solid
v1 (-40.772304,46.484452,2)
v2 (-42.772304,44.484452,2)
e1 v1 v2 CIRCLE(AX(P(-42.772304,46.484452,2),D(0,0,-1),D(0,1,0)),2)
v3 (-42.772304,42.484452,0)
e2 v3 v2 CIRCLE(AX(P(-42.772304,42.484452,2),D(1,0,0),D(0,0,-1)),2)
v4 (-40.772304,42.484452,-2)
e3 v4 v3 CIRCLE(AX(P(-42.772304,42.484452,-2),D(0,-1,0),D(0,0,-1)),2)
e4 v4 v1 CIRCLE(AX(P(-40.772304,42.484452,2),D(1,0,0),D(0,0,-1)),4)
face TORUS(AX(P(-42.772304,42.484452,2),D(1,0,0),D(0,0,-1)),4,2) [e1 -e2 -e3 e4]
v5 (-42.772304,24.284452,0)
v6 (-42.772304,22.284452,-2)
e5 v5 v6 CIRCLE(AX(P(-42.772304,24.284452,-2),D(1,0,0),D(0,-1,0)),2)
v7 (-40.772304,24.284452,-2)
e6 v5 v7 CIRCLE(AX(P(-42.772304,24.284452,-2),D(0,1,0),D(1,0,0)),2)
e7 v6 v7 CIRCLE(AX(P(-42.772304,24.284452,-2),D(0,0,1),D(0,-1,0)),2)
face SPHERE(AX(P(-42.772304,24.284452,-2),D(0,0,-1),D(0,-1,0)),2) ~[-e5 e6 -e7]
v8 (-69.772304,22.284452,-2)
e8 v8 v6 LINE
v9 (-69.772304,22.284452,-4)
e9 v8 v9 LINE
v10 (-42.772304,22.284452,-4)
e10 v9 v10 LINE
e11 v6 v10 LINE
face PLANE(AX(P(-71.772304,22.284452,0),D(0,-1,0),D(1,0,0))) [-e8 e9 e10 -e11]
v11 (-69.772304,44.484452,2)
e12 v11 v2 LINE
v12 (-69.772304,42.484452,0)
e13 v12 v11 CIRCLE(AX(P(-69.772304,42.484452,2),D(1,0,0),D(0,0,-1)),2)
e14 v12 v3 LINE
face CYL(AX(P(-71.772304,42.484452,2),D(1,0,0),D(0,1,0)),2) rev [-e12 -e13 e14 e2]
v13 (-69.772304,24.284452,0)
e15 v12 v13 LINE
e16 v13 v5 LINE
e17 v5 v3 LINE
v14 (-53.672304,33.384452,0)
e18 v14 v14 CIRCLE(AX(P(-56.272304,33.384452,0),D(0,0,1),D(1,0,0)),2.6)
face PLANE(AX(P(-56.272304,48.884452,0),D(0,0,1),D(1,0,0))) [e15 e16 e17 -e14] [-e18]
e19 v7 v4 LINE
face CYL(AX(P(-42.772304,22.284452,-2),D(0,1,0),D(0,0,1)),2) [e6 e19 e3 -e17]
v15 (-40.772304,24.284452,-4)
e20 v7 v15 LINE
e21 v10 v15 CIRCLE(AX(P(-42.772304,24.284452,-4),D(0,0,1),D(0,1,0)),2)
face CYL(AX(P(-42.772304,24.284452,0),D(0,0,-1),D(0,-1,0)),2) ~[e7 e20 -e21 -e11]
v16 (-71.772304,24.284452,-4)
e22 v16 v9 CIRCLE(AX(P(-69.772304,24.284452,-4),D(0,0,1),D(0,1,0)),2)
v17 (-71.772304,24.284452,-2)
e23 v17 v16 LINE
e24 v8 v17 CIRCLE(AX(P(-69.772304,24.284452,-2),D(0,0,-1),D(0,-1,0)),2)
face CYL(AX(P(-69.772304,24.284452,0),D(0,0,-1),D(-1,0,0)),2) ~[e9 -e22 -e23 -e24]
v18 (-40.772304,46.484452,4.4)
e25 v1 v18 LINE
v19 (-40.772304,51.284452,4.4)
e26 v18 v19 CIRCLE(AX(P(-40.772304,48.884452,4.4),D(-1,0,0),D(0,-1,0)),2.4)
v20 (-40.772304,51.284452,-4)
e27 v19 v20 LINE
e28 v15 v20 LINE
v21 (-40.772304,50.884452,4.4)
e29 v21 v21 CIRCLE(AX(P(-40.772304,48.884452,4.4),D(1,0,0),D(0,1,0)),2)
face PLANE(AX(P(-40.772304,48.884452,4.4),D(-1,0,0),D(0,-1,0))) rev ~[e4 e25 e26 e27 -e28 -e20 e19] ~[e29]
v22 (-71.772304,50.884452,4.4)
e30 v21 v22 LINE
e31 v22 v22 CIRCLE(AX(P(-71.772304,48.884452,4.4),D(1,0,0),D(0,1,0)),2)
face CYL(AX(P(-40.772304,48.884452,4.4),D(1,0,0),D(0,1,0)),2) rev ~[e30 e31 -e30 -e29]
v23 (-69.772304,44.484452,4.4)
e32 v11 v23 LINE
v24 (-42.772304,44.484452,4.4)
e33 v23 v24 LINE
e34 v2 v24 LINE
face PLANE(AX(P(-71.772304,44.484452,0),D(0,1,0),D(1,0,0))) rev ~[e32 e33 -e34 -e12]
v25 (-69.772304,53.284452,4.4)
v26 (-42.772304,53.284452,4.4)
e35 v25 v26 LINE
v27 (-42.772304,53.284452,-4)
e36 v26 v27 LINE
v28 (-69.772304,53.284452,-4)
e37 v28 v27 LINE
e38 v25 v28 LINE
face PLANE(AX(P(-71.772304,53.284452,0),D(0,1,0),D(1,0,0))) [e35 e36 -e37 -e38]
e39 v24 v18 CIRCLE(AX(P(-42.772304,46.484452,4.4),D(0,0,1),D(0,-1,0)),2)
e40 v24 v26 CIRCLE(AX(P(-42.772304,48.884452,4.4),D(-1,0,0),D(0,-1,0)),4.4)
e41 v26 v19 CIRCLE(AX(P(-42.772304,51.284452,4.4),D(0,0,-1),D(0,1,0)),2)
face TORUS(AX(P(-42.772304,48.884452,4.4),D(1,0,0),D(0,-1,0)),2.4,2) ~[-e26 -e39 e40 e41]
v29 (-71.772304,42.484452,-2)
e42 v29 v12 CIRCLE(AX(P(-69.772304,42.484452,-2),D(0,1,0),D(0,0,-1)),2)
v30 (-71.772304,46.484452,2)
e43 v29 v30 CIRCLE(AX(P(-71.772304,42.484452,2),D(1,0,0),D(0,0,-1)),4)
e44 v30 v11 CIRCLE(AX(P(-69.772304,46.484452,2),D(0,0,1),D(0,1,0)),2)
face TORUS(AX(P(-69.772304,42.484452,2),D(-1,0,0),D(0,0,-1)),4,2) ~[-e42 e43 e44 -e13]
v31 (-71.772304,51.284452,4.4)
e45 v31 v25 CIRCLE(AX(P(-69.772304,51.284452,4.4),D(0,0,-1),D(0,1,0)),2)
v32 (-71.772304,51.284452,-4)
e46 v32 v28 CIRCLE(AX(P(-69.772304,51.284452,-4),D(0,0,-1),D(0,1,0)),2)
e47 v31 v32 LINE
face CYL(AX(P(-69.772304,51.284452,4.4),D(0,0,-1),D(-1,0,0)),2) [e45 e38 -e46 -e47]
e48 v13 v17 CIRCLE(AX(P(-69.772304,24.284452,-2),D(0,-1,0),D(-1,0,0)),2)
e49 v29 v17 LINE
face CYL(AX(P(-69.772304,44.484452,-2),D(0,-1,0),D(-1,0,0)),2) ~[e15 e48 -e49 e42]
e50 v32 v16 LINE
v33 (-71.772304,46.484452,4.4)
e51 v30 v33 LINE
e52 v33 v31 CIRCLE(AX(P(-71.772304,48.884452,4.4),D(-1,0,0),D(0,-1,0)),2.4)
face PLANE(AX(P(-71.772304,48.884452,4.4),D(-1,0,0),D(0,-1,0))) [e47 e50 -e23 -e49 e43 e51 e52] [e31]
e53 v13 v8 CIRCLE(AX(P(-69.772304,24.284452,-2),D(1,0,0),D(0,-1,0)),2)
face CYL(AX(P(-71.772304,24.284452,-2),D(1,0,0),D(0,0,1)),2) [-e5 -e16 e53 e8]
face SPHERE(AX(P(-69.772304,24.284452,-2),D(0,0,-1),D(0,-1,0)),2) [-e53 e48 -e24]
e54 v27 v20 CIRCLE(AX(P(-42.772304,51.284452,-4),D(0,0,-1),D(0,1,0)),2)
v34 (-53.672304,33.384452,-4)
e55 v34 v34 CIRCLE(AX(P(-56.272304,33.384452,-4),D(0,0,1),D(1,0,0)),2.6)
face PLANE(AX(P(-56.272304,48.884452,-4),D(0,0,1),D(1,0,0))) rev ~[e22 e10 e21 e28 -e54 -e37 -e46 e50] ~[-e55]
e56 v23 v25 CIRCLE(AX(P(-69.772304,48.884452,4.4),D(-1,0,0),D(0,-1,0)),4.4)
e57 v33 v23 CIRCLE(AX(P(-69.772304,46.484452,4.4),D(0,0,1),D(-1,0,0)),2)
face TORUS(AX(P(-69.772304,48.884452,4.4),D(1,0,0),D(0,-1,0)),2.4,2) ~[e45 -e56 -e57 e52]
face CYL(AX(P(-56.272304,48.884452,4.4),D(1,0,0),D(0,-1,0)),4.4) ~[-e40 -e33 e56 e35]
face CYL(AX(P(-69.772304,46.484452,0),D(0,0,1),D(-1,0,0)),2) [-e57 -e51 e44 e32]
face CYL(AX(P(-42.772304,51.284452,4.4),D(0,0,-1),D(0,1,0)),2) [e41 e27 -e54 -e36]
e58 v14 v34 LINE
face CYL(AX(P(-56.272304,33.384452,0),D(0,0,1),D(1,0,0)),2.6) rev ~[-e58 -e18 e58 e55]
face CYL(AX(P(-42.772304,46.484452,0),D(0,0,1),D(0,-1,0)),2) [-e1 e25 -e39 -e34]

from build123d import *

# Parameters (mm, degrees)
F0_W     = 31
F0_H     = 8.8
F0_H_2   = 22.2
F0_R     = 2.6
F1_DEPTH = 4
F2_DEPTH = 4.4
F3_W     = 31
F3_H     = 4.4
F5_R     = 2
F6_DEPTH = 31.001
F7_R     = 2


with BuildPart() as f1:
    # F0 (on Top) → F1 (new body)
    with BuildSketch(Plane.XY):
        with Locations((-56.2723039389, 48.8844518721)):
            Rectangle(F0_W, F0_H)
        with Locations((-56.2723039389, 33.3844518721)):
            Rectangle(F0_W, F0_H_2)
        with Locations((-56.2723039389, 33.3844518721)):
            Circle(F0_R, mode=Mode.SUBTRACT)
    extrude(amount=-F1_DEPTH)

    # F0 (on Top) → F2 (join)
    with BuildSketch(Plane.XY):
        with Locations((-56.2723039389, 48.8844518721)):
            Rectangle(F0_W, F0_H)
    extrude(amount=F2_DEPTH)

    # F3 (on face) → F4 (revolve)
    with BuildSketch(Plane.XY.offset(4.4)):
        with Locations((-56.2723039389, 46.6844518721)):
            Rectangle(F3_W, F3_H)
    revolve(axis=Axis((-56.2723039389, 48.8844518721, 4.4), (-1, 0, 0)))

    # F5 (on face) → F6 (cut, through all)
    with BuildSketch(Plane.YZ.offset(-40.7723039389)):
        with Locations((48.8844518721, 4.4)):
            Circle(F5_R)
    extrude(amount=-F6_DEPTH, mode=Mode.SUBTRACT)

    # F7
    f7_edges = [f1.edges().sort_by_distance(p)[0] for p in [
        (-56.272304, 44.484452, 0),
        (-40.772304, 22.284452, -2),
        (-71.772304, 22.284452, -2),
        (-56.272304, 22.284452, 0),
        (-40.772304, 33.384452, 0),
        (-71.772304, 33.384452, 0),
        (-71.772304, 53.284452, 0.2),
        (-40.772304, 53.284452, 0.2),
        (-71.772304, 48.884452, 8.8),
        (-40.772304, 48.884452, 8.8),
    ]]
    fillet(f7_edges, radius=F7_R)


solid = f1.part
